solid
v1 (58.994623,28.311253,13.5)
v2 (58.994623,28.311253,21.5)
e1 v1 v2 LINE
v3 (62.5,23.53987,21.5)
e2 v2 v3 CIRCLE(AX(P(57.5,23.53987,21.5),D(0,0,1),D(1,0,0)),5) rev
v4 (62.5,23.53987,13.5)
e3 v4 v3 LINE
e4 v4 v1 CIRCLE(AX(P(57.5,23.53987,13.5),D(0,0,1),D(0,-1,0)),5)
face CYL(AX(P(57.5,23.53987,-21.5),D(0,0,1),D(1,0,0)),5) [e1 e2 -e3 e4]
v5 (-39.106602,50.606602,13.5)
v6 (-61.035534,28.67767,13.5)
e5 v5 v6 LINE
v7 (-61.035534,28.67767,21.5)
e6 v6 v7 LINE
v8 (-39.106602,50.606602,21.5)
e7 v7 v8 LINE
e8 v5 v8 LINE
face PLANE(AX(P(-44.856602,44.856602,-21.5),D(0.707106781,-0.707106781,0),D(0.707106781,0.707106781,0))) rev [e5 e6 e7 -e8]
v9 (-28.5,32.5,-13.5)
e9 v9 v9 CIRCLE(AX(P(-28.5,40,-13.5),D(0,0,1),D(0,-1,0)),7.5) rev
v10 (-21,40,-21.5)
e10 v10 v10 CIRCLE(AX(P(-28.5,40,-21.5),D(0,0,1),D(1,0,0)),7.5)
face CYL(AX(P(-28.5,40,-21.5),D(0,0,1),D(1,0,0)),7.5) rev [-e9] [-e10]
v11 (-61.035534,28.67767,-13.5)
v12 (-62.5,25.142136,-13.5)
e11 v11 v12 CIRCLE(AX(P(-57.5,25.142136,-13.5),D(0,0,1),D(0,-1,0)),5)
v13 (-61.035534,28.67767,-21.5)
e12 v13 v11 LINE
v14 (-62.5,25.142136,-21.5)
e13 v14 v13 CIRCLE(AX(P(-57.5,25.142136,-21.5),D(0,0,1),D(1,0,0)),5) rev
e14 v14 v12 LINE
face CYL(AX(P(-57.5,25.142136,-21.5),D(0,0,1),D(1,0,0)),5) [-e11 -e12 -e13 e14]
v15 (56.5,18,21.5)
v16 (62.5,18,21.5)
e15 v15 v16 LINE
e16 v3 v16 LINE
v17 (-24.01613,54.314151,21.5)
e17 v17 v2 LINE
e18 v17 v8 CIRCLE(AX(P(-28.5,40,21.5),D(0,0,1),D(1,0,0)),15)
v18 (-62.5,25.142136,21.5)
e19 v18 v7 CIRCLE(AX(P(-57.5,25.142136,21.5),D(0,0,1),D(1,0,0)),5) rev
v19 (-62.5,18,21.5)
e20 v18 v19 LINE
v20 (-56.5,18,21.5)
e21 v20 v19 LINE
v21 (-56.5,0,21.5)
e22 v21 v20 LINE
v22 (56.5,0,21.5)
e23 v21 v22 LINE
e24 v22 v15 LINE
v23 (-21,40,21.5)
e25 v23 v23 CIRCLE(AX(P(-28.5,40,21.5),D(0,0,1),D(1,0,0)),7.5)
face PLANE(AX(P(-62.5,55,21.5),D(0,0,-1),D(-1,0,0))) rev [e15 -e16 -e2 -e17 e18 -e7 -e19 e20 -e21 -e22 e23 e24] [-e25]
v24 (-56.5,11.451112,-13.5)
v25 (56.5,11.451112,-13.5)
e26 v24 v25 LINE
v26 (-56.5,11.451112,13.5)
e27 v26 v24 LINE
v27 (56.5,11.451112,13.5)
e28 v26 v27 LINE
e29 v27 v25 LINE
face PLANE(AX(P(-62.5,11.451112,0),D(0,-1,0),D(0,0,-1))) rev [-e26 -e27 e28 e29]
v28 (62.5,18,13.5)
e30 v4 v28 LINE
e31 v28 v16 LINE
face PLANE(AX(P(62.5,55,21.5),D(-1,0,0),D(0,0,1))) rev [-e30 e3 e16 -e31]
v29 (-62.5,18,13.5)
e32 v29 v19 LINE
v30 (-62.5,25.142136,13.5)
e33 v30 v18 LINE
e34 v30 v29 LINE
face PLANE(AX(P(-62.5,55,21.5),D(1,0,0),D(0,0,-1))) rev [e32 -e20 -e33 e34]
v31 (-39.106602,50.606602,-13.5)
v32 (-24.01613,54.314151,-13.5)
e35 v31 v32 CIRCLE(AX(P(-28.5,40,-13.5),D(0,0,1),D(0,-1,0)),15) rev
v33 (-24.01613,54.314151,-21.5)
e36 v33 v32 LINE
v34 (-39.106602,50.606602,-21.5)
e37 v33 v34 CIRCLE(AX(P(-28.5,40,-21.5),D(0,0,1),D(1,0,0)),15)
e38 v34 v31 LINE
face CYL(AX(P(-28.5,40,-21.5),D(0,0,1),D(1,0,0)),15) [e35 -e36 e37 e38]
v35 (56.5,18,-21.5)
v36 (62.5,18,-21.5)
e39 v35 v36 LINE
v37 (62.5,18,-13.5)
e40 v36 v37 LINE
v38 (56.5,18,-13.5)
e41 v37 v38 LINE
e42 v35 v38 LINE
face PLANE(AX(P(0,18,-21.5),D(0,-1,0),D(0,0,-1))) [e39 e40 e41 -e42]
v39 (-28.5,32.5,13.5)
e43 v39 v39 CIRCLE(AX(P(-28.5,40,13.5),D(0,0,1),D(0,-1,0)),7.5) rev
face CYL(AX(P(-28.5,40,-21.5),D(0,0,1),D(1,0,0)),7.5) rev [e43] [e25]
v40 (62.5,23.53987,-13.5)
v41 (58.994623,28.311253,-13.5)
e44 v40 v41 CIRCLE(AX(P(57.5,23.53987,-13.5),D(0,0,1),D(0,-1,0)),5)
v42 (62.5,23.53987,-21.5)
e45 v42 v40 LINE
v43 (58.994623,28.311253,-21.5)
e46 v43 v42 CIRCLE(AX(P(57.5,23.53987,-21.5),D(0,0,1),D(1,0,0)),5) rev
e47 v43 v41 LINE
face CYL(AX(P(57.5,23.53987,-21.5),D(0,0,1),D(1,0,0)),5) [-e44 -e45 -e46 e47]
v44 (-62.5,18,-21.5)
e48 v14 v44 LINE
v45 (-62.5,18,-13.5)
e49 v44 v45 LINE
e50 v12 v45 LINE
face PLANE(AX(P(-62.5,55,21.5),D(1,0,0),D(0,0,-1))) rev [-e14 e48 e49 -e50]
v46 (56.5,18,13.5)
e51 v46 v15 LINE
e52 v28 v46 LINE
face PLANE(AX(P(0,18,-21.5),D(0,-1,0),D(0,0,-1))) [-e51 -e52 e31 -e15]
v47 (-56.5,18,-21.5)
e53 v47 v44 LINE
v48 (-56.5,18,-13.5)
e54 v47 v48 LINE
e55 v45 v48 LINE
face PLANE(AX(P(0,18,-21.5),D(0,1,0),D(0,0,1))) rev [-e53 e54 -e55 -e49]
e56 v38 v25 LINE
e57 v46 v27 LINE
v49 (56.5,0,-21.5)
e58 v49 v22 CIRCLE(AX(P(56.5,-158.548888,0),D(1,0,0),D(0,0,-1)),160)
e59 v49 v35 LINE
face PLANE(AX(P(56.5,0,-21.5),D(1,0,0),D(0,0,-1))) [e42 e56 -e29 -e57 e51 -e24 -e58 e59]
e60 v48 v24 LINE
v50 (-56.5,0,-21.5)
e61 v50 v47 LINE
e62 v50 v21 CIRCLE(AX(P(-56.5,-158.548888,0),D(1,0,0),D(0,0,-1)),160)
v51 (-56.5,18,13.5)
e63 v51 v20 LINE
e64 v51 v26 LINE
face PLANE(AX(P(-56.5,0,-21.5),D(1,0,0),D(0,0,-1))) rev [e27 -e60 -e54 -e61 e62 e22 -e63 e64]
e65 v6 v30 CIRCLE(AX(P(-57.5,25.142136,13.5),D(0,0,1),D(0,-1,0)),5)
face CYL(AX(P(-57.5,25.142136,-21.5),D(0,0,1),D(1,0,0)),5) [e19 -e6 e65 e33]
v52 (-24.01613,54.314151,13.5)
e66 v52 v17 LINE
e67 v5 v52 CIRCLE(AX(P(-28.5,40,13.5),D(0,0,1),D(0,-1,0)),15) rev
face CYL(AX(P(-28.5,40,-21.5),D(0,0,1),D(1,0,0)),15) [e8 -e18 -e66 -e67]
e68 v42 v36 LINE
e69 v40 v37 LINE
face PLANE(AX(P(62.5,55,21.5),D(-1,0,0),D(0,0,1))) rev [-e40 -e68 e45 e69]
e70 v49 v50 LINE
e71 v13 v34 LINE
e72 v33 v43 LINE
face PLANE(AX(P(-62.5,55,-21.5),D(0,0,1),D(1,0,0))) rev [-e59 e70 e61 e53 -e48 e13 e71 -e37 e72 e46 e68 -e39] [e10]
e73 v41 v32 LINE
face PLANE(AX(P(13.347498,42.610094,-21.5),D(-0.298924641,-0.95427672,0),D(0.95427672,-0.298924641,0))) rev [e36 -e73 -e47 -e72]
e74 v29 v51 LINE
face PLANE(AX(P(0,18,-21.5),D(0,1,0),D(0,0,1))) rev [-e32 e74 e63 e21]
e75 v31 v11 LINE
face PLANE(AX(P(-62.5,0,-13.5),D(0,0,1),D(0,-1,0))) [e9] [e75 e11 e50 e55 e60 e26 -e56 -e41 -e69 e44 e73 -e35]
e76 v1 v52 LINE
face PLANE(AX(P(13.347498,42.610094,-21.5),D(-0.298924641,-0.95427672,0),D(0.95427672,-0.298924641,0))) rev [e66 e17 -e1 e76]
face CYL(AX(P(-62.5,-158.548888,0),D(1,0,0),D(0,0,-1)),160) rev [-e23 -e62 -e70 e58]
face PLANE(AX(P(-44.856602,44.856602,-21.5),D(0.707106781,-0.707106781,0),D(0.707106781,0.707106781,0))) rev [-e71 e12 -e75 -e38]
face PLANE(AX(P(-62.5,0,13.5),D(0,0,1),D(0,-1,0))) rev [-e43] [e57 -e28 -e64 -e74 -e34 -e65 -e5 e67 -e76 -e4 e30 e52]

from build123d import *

# Parameters (mm, degrees)
SKETCH1_W           = 125
SKETCH1_H           = 43
BOSS_EXTRUDE1_DEPTH = 55
SKETCH2_OUTSIDE_W   = 155.634
SKETCH2_OUTSIDE_H   = 85.634
SKETCH2_OUTSIDE_R   = 7.5
CUT_EXTRUDE1_DEPTH  = 94.702988213
SKETCH8_R           = 160
CUT_EXTRUDE3_DEPTH  = 133.846716181
SKETCH3_W           = 27
SKETCH3_H           = 43.548888359
CUT_EXTRUDE2_DEPTH  = 139.247061452


with BuildPart() as part:
    # Sketch1 → Boss-Extrude1 (new body)
    with BuildSketch(Plane(origin=(0, 0, 0), x_dir=(1, 0, 0), z_dir=(0, 1, 0))):
        Rectangle(SKETCH1_W, SKETCH1_H)
    extrude(amount=BOSS_EXTRUDE1_DEPTH)

    # Sketch2 outside → Cut-Extrude1 (cut, through all)
    # profile 1 of 2: a face of its own
    with BuildSketch(Plane.XY.offset(21.5)):
        with Locations((0, 27.5)):
            Rectangle(SKETCH2_OUTSIDE_W, SKETCH2_OUTSIDE_H)
        with BuildLine():
            Line((-56.5, 18), (-56.5, 0))
            Line((-56.5, 0), (56.5, 0))
            Line((56.5, 0), (56.5, 18))
            Line((56.5, 18), (62.5, 18))
            Line((62.5, 18), (62.5, 23.539869777))
            ThreePointArc((62.5, 23.539869777), (61.529461255, 26.500180908), (58.994623203, 28.311253379))
            Line((58.994623203, 28.311253379), (-24.016130392, 54.314150807))
            ThreePointArc((-24.016130392, 54.314150807), (-32.078888401, 54.566796416), (-39.106601718, 50.606601718))
            Line((-39.106601718, 50.606601718), (-61.035533906, 28.67766953))
            ThreePointArc((-61.035533906, 28.67766953), (-62.119397663, 27.055552786), (-62.5, 25.142135624))
            Line((-62.5, 25.142135624), (-62.5, 18))
            Line((-62.5, 18), (-56.5, 18))
        make_face(mode=Mode.SUBTRACT)
    # profile 2 of 2: a face of its own
    with BuildSketch(Plane.XY.offset(21.5)):
        with Locations((-28.5, 40)):
            Circle(SKETCH2_OUTSIDE_R)
    extrude(amount=-CUT_EXTRUDE1_DEPTH, mode=Mode.SUBTRACT)

    # Sketch8 → Cut-Extrude3 (cut, through all)
    with BuildSketch(Plane(origin=(56.5, 0, 0), x_dir=(0, 0, -1), z_dir=(1, 0, 0))):
        with Locations((0, -158.548888359)):
            Circle(SKETCH8_R)
    extrude(amount=-CUT_EXTRUDE3_DEPTH, mode=Mode.SUBTRACT)

    # Sketch3 → Cut-Extrude2 (cut, through all)
    with BuildSketch(Plane(origin=(62.5, 0, 0), x_dir=(0, 0, -1), z_dir=(1, 0, 0))):
        with Locations((0, 33.22555582)):
            Rectangle(SKETCH3_W, SKETCH3_H)
    extrude(amount=-CUT_EXTRUDE2_DEPTH, mode=Mode.SUBTRACT)


solid = part.part
